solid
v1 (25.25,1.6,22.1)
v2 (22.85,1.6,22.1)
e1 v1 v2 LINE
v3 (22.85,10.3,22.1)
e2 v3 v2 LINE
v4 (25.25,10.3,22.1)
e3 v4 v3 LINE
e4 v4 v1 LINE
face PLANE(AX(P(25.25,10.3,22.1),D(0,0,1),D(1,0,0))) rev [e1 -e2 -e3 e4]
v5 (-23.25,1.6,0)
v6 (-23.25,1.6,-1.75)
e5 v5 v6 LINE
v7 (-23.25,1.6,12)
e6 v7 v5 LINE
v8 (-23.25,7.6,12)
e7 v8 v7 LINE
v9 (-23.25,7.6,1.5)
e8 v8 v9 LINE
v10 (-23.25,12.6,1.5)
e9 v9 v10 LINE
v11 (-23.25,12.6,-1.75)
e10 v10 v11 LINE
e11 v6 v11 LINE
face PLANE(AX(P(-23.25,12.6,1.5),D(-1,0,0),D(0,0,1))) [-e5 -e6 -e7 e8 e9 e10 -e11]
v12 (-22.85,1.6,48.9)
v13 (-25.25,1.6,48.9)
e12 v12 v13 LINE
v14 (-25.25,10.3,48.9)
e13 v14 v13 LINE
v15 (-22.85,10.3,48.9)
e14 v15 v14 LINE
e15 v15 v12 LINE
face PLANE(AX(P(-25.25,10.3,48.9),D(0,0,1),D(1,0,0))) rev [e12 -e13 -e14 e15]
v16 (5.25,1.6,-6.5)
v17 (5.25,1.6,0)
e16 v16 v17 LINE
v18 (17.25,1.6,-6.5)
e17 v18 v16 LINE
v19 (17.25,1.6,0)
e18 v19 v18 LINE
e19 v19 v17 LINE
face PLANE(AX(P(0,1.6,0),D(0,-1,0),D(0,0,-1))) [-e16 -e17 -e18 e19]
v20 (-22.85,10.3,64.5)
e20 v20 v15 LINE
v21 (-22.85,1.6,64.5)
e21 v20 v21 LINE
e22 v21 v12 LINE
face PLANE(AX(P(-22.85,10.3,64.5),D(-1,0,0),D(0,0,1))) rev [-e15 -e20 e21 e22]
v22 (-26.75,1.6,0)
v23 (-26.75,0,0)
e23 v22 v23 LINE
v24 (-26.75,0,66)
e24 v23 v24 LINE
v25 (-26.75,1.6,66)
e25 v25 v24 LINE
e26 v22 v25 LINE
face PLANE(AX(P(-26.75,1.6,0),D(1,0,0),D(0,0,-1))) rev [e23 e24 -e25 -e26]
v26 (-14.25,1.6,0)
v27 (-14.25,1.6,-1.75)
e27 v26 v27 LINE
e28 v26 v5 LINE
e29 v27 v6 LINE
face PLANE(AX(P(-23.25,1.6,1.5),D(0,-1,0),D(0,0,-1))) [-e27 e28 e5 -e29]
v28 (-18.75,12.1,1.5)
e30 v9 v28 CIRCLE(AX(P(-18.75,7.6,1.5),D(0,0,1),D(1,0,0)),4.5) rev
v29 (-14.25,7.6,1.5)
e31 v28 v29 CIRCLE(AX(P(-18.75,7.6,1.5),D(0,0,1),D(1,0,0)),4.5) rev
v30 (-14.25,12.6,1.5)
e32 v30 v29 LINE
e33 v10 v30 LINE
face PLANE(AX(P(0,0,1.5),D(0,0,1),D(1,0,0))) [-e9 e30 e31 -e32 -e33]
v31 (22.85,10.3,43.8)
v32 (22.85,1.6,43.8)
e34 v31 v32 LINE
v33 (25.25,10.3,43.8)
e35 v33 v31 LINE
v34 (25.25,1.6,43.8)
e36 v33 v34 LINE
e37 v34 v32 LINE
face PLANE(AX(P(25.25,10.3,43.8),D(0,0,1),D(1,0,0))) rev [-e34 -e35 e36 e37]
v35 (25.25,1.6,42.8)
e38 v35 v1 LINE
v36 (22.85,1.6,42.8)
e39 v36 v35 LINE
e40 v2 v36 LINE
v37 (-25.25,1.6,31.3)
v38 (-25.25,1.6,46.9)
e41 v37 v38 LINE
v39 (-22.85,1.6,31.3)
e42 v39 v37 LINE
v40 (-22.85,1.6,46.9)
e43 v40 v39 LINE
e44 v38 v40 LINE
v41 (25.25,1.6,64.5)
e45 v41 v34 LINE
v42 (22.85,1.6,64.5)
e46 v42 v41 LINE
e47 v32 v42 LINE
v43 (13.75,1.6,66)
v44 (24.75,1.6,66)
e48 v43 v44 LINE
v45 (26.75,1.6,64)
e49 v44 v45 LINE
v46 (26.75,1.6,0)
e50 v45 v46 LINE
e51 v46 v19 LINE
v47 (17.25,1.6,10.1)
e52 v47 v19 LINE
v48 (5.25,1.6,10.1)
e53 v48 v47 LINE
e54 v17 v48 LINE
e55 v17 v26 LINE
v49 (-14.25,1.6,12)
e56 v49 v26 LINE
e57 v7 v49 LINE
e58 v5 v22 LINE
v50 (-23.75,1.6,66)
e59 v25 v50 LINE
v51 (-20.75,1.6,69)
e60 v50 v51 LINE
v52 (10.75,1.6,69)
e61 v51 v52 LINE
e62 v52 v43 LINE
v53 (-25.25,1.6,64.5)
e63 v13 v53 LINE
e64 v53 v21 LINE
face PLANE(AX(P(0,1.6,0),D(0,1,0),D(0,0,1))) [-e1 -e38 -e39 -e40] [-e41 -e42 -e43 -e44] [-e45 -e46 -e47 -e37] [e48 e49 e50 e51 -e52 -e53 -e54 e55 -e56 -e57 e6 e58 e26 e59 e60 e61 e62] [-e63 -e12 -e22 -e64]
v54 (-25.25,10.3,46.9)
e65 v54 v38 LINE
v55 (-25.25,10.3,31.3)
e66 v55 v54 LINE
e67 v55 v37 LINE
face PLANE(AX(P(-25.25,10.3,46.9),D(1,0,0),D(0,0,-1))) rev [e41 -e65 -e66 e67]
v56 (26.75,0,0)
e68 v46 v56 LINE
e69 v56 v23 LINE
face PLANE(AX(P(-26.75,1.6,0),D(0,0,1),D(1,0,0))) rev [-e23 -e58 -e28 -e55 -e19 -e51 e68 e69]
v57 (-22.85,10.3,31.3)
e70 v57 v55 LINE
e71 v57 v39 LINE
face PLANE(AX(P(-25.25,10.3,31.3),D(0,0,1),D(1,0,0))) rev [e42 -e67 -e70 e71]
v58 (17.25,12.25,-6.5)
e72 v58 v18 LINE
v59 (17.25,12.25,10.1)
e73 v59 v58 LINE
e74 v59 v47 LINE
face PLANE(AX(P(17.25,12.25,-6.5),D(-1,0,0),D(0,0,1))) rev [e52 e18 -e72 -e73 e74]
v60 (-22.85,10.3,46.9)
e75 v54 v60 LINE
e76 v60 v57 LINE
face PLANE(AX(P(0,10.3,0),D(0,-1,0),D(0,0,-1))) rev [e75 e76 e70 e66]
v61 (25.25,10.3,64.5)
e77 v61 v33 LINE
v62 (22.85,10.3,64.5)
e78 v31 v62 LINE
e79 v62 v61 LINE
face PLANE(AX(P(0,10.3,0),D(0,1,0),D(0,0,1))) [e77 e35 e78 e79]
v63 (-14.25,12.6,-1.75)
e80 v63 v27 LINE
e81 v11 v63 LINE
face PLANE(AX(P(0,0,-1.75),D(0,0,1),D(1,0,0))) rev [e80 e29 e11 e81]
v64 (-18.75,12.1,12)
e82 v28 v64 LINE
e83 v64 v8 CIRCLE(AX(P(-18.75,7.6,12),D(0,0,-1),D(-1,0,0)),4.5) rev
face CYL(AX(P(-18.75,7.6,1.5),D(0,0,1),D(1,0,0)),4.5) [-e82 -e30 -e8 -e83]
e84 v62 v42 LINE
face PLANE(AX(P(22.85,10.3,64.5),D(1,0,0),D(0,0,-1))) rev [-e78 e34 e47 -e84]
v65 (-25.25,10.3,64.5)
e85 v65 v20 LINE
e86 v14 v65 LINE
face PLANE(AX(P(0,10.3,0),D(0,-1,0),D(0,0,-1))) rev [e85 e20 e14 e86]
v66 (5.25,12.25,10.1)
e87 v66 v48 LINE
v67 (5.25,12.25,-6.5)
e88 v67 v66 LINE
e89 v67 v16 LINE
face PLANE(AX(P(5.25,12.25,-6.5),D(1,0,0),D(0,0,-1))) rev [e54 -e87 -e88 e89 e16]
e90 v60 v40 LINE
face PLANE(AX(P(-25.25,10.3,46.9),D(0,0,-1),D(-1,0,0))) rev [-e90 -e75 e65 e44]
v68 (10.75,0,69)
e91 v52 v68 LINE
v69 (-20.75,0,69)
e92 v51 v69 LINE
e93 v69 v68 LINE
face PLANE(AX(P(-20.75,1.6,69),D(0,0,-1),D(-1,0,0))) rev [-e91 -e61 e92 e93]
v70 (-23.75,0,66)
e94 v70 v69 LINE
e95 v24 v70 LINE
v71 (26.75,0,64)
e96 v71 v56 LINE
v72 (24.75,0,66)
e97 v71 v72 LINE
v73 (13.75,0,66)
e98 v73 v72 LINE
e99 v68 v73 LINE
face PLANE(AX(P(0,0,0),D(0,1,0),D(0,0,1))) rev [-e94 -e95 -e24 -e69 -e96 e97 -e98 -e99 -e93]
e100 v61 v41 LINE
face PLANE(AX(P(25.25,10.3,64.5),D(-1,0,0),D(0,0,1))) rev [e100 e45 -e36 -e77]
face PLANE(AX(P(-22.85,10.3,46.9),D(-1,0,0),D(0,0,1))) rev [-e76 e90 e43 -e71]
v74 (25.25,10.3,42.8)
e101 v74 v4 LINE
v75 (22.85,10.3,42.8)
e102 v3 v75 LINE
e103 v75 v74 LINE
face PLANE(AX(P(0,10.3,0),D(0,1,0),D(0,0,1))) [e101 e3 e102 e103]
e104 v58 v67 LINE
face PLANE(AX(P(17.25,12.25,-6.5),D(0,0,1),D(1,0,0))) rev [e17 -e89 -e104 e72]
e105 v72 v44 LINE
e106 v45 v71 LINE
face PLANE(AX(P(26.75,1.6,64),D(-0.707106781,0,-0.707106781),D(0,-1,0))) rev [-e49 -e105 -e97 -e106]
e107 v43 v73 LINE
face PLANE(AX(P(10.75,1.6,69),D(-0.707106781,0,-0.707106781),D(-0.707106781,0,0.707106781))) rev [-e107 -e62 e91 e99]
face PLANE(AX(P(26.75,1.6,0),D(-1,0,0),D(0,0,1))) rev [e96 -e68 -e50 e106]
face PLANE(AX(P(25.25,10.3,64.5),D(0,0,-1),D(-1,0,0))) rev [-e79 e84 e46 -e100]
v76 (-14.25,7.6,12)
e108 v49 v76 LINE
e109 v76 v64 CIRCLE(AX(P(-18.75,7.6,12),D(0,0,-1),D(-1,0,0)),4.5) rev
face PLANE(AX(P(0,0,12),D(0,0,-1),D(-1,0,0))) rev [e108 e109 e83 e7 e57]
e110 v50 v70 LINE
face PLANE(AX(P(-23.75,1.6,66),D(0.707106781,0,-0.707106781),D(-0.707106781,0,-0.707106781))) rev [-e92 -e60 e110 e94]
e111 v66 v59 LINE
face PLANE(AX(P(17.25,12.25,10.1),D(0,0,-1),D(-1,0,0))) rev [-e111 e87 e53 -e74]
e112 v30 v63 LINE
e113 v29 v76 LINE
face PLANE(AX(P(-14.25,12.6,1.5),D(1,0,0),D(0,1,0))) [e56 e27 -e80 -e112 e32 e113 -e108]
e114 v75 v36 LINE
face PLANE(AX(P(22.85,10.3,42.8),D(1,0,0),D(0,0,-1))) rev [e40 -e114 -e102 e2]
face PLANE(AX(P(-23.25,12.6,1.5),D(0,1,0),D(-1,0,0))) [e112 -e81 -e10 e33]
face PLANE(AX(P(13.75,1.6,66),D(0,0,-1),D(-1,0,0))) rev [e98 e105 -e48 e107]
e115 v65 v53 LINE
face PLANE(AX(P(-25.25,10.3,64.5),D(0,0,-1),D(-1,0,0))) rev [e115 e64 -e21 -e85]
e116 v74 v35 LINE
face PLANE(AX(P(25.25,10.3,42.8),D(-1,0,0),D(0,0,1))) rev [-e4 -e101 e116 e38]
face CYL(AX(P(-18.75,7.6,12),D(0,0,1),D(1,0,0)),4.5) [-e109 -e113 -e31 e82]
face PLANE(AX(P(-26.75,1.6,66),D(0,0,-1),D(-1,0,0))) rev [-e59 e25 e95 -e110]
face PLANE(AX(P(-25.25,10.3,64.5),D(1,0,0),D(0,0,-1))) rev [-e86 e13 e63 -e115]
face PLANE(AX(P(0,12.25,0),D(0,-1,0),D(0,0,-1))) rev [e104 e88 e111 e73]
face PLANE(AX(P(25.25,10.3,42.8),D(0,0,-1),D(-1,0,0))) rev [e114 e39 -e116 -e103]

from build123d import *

# Parameters (mm, degrees)
BOSS_EXTRUDE1_DEPTH      = 1.6
CHAMFER1_SIZE            = 2
SKETCH2_W                = 12
SKETCH2_H                = 16.6
BOSS_EXTRUDE2_DEPTH      = 10.65
SKETCH3_W                = 2.4
SKETCH3_H                = 15.6
SKETCH3_H_2              = 20.7
BOSS_EXTRUDE3_DEPTH      = 8.7
BOSS_EXTRUDE4_DEPTH      = 1.75
BOSS_EXTRUDE4_DEPTH_BACK = 1.5
SKETCH4_W                = 9
SKETCH4_H                = 11
SKETCH5_W                = 9
SKETCH5_H                = 10.5
BOSS_EXTRUDE5_DEPTH      = 10.5
FILLET1_R                = 4.5


with BuildPart() as part:
    # Sketch1 → Boss-Extrude1 (new body)
    with BuildSketch(Plane(origin=(0, 0, 0), x_dir=(1, 0, 0), z_dir=(0, 1, 0))):
        Polygon((-26.75, -66), (-23.75, -66), (-20.75, -69), (10.75, -69), (13.75, -66), (26.75, -66), (26.75, 0), (-26.75, 0), align=None)
    extrude(amount=BOSS_EXTRUDE1_DEPTH)

    # Chamfer1
    chamfer1_edges = [part.edges().sort_by_distance(p)[0] for p in [
        (26.75, 0.8, 66),
    ]]
    chamfer(chamfer1_edges, length=CHAMFER1_SIZE)

    # Sketch2 → Boss-Extrude2 (add)
    with BuildSketch(Plane(origin=(0, 1.6, 0), x_dir=(1, 0, 0), z_dir=(0, 1, 0))):
        with Locations((11.25, -1.8)):
            Rectangle(SKETCH2_W, SKETCH2_H)
    extrude(amount=BOSS_EXTRUDE2_DEPTH)

    # Sketch3 → Boss-Extrude3 (add)
    with BuildSketch(Plane(origin=(0, 1.6, 0), x_dir=(1, 0, 0), z_dir=(0, 1, 0))):
        with Locations((-24.05, -56.7)):
            Rectangle(SKETCH3_W, SKETCH3_H)
        with Locations((-24.05, -39.1)):
            Rectangle(SKETCH3_W, SKETCH3_H)
        with Locations((24.05, -54.15)):
            Rectangle(SKETCH3_W, SKETCH3_H_2)
        with Locations((24.05, -32.45)):
            Rectangle(SKETCH3_W, SKETCH3_H_2)
    extrude(amount=BOSS_EXTRUDE3_DEPTH)

    # Sketch4 → Boss-Extrude4 (add, two sides: drawn at the far end of the back side and taken through both)
    with BuildSketch(Plane(origin=(0, 0, 0), x_dir=(-1, 0, 0), z_dir=(0, 0, -1)).offset(-BOSS_EXTRUDE4_DEPTH_BACK)):
        with Locations((18.75, 7.1)):
            Rectangle(SKETCH4_W, SKETCH4_H)
    extrude(amount=BOSS_EXTRUDE4_DEPTH + BOSS_EXTRUDE4_DEPTH_BACK)

    # Sketch5 → Boss-Extrude5 (add)
    with BuildSketch(Plane.XY.offset(1.5)):
        with Locations((-18.75, 6.85)):
            Rectangle(SKETCH5_W, SKETCH5_H)
    extrude(amount=BOSS_EXTRUDE5_DEPTH)

    # Fillet1
    fillet1_edges = [part.edges().sort_by_distance(p)[0] for p in [
        (-14.25, 12.1, 6.75),
        (-23.25, 12.1, 6.75),
    ]]
    fillet(fillet1_edges, radius=FILLET1_R - 0.0001)  # a hair under: the kernel refuses the full size


solid = part.part
